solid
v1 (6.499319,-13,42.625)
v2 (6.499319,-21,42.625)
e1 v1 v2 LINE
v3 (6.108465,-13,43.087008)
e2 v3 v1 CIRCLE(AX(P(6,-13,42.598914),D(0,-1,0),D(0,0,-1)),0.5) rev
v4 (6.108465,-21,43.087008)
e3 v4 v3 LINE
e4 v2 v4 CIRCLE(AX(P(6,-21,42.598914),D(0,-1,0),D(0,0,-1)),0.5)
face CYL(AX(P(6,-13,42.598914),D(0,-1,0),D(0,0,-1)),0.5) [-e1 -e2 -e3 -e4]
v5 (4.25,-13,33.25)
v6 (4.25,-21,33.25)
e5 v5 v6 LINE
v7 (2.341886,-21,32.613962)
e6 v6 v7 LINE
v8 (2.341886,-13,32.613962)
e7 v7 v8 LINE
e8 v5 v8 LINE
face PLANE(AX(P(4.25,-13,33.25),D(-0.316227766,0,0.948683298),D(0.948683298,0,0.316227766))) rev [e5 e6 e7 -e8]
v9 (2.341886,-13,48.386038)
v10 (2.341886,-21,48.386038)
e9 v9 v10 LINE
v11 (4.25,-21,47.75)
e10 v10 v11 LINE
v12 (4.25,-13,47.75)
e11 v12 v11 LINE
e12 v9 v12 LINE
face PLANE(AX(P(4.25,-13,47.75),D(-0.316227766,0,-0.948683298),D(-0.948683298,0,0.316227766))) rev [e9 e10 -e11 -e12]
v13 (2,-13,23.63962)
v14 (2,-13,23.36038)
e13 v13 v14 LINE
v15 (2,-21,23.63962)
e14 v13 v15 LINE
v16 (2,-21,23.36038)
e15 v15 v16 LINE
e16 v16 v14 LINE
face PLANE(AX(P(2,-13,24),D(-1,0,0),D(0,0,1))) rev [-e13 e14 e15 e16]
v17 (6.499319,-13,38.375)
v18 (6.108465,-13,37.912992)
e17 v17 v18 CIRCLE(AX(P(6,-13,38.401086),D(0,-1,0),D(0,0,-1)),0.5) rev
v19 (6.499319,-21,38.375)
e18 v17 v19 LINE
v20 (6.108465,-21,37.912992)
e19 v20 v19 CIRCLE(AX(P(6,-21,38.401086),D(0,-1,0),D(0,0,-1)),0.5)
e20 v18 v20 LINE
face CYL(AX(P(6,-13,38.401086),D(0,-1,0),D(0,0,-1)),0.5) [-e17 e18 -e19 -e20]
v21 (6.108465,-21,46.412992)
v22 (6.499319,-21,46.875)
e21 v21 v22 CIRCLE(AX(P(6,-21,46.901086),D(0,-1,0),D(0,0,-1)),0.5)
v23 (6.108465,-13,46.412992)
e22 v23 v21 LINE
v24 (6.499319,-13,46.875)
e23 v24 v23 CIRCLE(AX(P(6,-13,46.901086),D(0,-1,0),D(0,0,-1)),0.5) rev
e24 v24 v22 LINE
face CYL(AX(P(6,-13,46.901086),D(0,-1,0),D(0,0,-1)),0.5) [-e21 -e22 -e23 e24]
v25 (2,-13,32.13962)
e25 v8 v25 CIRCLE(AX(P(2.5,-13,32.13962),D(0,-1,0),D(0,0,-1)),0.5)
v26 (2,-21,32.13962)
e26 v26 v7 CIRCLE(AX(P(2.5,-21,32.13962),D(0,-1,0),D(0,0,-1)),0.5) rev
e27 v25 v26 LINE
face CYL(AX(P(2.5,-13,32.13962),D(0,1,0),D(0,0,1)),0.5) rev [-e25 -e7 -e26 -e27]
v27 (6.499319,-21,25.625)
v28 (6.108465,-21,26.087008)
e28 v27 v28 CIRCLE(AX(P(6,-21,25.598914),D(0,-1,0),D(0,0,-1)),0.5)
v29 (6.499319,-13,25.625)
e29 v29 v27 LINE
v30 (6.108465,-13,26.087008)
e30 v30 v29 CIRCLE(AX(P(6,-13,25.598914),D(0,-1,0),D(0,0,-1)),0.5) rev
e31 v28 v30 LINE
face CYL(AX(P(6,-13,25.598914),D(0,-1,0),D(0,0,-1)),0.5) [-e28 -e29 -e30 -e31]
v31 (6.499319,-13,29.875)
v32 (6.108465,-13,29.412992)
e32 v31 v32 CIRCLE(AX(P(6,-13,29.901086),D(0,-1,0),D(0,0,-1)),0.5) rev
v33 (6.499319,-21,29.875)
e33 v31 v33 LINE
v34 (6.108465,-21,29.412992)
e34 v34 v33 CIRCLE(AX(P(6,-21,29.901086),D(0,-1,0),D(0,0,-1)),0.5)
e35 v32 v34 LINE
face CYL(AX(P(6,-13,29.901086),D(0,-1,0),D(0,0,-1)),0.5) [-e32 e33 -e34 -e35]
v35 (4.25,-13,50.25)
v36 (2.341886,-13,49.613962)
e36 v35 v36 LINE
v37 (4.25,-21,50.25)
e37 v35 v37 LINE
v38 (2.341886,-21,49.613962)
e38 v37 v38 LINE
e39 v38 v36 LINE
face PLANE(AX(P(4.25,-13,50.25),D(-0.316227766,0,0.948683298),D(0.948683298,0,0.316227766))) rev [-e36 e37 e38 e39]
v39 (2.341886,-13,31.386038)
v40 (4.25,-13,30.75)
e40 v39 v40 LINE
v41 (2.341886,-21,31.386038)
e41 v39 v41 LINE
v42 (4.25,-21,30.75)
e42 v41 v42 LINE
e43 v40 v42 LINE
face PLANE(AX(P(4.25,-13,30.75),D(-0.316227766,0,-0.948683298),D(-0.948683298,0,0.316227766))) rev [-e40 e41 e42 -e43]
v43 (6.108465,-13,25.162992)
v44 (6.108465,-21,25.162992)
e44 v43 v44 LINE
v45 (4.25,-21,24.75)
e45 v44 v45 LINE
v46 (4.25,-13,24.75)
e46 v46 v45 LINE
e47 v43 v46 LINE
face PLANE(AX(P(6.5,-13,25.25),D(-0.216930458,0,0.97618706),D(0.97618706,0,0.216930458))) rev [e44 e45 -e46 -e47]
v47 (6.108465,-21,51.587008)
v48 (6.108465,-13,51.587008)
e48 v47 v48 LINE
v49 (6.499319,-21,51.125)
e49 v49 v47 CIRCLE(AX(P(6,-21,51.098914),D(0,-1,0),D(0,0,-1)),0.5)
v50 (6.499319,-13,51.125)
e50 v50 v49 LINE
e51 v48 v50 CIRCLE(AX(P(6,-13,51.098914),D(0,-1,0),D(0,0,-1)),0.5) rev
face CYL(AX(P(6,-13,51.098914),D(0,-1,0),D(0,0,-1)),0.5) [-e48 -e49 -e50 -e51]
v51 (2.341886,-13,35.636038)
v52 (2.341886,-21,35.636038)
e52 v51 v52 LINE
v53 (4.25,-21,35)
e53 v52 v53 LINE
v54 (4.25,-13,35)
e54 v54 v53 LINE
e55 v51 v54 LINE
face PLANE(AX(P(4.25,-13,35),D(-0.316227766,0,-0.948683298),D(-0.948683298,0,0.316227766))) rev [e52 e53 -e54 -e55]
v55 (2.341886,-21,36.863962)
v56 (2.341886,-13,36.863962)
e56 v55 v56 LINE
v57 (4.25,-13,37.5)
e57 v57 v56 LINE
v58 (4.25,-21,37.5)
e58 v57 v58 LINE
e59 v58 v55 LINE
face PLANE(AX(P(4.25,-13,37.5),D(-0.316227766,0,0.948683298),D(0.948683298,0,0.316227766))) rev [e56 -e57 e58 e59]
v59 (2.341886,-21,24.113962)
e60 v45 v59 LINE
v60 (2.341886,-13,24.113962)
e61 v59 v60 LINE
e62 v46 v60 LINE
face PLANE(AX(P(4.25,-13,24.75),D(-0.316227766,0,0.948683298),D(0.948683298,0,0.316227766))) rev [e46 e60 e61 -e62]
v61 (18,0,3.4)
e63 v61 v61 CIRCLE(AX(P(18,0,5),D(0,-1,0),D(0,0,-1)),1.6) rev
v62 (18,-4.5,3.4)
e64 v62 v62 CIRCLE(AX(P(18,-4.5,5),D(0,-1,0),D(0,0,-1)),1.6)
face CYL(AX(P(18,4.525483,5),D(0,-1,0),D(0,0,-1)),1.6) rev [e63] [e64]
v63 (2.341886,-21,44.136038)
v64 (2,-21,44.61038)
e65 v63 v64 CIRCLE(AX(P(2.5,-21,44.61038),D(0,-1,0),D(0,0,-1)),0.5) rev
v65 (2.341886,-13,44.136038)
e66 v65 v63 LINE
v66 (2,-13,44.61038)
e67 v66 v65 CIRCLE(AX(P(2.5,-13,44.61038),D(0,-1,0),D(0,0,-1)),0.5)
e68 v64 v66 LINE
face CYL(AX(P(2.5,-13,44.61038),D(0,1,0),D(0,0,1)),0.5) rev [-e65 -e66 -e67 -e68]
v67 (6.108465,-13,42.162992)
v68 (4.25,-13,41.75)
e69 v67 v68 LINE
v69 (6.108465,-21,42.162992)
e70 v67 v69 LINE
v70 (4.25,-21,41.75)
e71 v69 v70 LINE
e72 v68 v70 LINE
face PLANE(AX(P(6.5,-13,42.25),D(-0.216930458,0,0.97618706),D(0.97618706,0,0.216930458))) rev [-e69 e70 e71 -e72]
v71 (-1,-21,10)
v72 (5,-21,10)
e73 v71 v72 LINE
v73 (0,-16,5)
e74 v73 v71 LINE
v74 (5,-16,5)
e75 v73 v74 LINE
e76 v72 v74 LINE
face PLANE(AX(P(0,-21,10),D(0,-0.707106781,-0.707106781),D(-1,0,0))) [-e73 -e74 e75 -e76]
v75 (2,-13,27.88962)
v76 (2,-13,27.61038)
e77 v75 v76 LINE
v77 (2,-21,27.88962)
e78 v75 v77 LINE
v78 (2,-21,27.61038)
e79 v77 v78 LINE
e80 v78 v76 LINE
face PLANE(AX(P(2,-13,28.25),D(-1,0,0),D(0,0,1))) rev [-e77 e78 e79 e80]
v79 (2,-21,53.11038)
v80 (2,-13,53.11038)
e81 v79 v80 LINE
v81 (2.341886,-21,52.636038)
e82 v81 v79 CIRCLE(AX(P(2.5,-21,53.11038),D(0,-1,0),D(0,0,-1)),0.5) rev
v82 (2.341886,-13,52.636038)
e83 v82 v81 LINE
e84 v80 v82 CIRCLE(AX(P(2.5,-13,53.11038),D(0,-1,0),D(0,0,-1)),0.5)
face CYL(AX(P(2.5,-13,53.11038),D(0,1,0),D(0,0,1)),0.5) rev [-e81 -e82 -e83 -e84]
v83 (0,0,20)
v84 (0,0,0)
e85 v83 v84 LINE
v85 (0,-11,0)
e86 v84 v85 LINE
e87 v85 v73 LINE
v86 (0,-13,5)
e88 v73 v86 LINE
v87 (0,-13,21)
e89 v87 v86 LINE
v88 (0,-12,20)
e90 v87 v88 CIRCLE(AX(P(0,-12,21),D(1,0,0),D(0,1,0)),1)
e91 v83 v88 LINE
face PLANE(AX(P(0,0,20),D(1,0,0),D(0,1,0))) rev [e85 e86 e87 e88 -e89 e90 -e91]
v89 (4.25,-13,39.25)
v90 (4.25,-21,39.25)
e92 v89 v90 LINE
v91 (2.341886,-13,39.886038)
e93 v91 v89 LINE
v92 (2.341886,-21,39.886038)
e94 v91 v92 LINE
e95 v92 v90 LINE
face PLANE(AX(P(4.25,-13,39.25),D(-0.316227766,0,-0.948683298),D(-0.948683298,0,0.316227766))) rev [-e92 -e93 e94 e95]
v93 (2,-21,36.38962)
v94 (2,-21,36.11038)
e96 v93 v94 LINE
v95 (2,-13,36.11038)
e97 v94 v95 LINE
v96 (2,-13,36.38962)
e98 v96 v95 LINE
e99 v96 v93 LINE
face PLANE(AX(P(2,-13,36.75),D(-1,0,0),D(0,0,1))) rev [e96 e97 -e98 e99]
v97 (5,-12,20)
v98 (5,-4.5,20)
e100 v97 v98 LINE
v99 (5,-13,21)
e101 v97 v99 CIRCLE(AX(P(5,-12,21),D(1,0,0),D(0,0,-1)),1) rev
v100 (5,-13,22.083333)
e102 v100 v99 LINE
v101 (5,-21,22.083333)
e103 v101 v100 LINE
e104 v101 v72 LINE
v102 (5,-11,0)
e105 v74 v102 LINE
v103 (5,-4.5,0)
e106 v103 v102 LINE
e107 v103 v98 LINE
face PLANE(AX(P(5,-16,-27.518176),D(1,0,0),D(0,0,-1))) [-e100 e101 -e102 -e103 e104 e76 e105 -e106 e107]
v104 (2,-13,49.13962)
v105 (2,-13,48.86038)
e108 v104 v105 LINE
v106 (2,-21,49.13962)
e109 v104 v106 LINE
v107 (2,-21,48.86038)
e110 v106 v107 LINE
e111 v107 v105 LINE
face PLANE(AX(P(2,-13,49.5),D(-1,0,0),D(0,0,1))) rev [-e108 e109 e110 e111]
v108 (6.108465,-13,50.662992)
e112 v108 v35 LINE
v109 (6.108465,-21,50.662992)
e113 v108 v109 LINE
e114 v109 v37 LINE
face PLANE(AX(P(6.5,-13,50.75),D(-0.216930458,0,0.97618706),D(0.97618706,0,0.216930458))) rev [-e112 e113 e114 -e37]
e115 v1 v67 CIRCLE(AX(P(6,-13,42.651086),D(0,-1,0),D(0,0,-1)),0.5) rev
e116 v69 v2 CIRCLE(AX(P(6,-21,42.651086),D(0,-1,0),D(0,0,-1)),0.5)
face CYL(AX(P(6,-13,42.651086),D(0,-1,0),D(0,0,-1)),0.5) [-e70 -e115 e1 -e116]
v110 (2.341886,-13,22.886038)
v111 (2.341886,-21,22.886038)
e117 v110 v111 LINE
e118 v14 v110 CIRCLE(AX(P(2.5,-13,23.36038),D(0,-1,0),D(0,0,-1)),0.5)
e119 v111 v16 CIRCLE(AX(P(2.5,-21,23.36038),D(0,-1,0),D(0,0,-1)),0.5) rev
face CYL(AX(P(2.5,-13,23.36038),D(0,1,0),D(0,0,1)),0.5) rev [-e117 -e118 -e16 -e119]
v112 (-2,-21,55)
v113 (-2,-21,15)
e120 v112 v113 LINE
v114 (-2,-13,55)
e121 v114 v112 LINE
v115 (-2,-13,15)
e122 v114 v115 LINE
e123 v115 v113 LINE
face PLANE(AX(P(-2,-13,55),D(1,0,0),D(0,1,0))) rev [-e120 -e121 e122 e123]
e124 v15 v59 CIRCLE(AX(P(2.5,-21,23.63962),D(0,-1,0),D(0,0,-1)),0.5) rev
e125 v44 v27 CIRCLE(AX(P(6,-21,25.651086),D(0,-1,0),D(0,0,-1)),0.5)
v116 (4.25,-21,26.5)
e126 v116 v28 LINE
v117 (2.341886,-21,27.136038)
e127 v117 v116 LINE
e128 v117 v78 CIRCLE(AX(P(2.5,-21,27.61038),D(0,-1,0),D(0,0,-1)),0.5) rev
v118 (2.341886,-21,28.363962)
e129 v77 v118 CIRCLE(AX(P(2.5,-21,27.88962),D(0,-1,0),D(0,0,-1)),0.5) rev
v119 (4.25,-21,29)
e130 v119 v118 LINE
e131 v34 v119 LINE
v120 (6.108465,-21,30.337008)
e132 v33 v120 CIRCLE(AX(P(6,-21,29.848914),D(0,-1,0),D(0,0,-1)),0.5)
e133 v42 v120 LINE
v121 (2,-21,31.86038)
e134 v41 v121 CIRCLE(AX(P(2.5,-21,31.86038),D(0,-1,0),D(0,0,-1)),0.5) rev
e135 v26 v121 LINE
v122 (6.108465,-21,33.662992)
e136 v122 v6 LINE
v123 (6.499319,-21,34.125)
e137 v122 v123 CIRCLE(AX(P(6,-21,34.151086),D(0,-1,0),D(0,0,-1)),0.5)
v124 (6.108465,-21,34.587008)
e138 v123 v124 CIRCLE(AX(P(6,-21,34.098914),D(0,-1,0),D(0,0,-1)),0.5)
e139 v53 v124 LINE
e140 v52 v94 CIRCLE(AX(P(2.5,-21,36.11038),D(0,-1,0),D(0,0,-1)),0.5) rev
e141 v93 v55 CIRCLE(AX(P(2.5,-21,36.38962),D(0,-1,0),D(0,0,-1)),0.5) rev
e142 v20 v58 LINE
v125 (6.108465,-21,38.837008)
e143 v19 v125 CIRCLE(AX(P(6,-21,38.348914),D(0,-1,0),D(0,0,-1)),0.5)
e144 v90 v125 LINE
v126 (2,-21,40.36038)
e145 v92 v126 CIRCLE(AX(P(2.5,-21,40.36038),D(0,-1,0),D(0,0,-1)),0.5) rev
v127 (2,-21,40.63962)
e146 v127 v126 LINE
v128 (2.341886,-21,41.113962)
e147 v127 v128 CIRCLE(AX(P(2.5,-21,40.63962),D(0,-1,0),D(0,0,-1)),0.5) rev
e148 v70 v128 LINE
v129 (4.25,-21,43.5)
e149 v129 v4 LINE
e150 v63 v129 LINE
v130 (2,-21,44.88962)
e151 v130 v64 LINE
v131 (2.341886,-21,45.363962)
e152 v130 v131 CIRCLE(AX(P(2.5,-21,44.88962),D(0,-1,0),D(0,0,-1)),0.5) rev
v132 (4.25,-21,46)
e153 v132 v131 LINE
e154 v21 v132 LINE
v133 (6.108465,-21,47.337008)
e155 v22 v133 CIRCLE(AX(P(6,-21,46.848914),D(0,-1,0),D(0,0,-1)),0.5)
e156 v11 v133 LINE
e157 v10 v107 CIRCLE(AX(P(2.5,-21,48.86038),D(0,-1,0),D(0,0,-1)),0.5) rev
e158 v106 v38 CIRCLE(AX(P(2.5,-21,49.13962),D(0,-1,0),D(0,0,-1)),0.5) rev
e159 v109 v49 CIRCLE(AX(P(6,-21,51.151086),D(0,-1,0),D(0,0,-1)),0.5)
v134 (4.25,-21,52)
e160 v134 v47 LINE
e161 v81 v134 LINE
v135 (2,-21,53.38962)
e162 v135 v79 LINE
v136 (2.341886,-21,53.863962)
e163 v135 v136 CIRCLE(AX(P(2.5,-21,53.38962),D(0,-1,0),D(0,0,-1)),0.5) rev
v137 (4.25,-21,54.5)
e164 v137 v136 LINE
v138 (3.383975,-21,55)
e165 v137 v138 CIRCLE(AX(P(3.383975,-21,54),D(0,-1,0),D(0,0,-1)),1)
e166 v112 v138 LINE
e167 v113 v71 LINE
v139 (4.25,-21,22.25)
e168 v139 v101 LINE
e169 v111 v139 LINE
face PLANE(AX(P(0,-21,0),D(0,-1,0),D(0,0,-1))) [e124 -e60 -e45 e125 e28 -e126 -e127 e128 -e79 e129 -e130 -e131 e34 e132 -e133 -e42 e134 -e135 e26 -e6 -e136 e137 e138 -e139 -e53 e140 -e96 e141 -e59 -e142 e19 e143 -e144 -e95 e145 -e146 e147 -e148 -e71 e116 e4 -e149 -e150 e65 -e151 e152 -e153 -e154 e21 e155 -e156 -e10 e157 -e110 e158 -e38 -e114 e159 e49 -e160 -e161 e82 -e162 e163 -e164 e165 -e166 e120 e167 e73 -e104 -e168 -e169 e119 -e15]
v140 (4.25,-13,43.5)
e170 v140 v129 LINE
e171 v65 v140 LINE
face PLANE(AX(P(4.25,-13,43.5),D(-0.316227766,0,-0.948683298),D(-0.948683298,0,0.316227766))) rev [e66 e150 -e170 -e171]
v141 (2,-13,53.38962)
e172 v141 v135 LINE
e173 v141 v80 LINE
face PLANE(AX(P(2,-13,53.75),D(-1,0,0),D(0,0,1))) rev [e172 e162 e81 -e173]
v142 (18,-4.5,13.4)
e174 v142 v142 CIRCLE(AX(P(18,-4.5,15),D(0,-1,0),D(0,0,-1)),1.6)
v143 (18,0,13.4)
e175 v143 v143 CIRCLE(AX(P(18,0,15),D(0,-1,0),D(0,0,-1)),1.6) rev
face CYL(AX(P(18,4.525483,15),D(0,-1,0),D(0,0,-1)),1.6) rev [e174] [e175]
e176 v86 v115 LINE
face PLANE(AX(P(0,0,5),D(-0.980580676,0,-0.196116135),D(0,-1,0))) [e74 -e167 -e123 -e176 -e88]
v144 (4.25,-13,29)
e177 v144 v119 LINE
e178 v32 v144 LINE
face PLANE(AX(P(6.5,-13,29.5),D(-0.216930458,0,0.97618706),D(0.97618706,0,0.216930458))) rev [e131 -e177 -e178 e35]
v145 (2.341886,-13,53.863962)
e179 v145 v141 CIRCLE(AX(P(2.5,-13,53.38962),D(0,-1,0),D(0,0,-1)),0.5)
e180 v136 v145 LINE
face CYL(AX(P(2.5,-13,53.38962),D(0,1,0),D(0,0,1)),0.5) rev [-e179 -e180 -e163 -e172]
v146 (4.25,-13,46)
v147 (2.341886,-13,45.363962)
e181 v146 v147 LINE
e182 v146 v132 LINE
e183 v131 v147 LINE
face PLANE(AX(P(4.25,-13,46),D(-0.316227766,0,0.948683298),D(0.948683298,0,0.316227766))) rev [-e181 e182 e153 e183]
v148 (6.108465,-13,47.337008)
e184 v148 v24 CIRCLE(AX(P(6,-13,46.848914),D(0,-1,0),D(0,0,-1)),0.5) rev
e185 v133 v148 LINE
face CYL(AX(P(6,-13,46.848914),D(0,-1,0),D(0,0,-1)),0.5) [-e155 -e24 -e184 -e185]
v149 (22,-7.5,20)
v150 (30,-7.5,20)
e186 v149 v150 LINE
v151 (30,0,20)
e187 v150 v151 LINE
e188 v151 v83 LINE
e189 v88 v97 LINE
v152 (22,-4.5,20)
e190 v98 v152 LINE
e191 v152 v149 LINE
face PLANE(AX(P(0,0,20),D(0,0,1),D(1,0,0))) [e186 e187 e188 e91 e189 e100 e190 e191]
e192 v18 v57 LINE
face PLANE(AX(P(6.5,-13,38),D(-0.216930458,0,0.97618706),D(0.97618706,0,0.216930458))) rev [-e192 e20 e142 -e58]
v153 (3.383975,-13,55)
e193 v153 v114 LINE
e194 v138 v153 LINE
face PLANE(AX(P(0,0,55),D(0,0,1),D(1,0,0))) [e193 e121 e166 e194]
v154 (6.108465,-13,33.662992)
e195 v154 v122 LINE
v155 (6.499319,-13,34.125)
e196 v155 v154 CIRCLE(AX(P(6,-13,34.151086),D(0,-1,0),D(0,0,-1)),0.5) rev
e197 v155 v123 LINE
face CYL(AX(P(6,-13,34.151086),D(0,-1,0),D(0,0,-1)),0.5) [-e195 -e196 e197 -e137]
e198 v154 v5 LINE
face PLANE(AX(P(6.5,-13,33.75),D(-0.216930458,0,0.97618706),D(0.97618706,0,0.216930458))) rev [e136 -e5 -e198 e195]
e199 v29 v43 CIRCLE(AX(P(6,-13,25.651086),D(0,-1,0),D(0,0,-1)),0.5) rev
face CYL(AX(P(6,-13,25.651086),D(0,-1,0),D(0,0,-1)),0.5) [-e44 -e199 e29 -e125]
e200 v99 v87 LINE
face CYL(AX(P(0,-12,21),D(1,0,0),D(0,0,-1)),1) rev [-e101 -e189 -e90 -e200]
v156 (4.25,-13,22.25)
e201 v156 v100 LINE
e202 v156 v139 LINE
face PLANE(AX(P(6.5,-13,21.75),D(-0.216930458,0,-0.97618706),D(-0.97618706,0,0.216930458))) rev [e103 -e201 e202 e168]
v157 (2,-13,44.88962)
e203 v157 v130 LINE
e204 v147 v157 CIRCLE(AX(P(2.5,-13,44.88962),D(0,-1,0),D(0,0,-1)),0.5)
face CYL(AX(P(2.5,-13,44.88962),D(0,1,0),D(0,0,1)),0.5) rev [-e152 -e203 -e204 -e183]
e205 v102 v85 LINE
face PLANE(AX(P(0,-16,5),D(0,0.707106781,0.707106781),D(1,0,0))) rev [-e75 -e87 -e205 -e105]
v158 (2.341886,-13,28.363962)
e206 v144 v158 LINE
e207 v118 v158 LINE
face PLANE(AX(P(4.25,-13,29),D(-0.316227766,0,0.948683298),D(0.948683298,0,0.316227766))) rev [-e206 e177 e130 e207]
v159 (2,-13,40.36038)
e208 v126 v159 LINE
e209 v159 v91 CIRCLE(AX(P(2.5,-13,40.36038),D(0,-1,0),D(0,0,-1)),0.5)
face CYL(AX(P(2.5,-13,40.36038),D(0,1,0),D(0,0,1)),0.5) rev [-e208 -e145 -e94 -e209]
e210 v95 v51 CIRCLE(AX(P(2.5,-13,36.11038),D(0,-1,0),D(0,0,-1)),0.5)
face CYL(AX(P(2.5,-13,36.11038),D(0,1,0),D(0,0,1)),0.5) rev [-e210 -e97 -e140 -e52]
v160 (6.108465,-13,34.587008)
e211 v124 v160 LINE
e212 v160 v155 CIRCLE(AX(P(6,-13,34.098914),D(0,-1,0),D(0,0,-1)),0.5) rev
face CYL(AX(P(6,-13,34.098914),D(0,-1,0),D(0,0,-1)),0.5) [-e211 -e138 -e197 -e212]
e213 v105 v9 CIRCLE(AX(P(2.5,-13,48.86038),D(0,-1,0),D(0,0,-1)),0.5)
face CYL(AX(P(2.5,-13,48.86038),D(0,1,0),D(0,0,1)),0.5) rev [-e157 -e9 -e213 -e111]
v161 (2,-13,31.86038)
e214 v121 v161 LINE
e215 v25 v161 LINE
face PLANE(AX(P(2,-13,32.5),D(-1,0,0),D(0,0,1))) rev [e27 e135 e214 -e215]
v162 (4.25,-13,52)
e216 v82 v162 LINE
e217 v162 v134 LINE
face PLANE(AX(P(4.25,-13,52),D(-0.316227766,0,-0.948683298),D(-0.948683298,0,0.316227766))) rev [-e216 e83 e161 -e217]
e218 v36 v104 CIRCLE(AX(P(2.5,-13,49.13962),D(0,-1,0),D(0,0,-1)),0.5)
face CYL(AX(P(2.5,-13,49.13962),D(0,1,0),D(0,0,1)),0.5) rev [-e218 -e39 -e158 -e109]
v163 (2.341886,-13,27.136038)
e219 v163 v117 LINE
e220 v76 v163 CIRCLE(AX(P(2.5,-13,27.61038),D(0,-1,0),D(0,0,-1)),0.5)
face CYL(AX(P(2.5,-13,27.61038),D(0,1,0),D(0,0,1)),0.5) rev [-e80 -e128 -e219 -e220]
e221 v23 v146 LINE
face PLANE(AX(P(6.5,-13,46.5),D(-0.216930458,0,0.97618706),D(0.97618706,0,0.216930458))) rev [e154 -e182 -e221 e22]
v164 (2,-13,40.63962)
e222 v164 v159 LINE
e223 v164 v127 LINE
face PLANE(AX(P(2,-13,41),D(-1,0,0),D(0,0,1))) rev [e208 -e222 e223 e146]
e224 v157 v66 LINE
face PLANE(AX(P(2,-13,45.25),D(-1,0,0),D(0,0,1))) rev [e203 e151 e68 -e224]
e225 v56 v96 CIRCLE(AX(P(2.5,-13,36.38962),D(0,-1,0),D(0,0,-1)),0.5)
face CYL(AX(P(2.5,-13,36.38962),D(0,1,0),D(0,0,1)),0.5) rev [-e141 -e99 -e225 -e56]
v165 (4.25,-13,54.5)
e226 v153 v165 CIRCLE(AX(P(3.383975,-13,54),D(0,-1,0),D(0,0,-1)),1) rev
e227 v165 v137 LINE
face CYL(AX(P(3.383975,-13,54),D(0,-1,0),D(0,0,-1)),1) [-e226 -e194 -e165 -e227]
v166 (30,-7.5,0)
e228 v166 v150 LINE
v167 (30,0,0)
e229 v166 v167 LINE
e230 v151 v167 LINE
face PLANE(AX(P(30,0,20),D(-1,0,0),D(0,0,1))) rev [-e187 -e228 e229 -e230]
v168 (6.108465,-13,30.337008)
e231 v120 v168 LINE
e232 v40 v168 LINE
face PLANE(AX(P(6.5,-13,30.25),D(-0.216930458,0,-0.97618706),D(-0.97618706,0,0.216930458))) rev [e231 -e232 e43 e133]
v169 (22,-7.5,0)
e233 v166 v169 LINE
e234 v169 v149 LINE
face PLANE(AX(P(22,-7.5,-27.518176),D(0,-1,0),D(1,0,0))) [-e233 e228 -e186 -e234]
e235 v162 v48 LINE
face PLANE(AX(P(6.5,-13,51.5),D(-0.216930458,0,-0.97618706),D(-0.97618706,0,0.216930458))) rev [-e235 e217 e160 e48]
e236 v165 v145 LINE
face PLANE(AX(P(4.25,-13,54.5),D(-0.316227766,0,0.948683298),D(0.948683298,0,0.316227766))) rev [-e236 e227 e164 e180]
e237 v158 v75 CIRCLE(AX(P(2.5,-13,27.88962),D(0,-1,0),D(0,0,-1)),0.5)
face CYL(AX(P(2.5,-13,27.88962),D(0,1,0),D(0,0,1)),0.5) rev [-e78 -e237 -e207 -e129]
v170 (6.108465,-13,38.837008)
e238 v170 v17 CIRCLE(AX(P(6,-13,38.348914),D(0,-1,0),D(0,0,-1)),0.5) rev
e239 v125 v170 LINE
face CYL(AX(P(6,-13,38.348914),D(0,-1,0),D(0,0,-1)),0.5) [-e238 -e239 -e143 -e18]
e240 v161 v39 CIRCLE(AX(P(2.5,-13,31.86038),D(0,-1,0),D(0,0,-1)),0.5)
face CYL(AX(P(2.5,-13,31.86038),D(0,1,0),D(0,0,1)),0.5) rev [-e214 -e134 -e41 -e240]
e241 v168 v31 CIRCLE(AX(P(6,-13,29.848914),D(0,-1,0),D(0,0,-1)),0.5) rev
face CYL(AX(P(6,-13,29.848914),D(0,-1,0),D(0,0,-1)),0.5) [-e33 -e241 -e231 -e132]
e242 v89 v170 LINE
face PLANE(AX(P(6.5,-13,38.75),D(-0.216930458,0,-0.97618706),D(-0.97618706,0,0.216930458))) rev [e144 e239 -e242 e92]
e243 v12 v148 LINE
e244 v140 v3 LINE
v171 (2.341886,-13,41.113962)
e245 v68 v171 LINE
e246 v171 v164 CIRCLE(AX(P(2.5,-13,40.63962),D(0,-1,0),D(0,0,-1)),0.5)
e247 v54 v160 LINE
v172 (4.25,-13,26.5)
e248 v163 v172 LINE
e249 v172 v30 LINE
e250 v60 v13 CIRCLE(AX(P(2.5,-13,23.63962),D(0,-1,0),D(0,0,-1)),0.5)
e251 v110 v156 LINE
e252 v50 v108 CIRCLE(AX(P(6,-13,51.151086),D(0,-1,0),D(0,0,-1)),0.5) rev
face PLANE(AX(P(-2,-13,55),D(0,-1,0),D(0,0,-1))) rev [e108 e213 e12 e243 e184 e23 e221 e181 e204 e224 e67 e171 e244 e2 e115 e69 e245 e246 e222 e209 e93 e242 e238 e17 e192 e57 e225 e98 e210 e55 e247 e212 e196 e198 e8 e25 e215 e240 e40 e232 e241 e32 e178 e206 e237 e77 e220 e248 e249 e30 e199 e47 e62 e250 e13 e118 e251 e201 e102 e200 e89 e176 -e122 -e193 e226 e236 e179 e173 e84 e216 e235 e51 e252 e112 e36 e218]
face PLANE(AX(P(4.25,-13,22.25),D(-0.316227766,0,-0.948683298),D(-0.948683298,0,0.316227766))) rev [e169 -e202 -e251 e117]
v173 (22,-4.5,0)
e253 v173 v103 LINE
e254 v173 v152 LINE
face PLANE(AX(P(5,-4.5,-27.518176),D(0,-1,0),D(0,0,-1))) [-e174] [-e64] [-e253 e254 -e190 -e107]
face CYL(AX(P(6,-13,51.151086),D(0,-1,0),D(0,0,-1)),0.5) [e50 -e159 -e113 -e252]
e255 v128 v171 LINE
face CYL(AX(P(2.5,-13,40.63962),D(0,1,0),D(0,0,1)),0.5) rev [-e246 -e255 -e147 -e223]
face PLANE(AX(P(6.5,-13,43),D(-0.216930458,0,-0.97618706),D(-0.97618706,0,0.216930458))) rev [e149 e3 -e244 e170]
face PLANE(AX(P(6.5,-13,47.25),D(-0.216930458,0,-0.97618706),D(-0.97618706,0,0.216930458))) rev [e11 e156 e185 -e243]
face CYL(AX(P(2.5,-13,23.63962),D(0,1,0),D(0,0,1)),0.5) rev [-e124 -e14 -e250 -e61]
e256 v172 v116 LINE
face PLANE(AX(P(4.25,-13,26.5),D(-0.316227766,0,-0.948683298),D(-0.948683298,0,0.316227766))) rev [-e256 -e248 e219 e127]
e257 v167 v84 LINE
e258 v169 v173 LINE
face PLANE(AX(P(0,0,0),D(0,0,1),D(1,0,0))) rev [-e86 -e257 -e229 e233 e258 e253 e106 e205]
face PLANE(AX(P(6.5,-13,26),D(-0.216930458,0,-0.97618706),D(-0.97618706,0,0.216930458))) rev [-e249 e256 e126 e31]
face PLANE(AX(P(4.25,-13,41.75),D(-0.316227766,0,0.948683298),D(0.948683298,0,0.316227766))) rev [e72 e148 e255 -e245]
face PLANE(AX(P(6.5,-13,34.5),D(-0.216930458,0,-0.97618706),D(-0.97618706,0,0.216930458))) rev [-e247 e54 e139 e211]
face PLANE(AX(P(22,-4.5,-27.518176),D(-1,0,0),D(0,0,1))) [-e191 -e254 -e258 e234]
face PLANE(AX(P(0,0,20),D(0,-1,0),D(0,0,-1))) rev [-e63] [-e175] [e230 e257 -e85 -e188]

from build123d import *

# Parameters (mm, degrees)
SKETCH1_W           = 30
SKETCH1_H           = 16
BOSS_EXTRUDE1_DEPTH = 20
CUT_EXTRUDE1_DEPTH  = 20
SKETCH3_W           = 6
SKETCH3_H           = 10
BOSS_EXTRUDE2_DEPTH = 5
SKETCH9_R           = 1.6
CUT_EXTRUDE3_DEPTH  = 4.5
SKETCH11_W          = 10
SKETCH11_H          = 8
BOSS_EXTRUDE4_DEPTH = 40
CHAMFER2_SIZE2      = 10
CHAMFER2_SIZE       = 2
FILLET1_R           = 1
CUT_EXTRUDE4_DEPTH  = 8
SKETCH13_W          = 2
SKETCH13_H          = 8
BOSS_EXTRUDE5_DEPTH = 10
LPATTERN1_COUNT     = 8
LPATTERN1_PITCH     = 4.25
FILLET2_R           = 0.5
FILLET3_R           = 1
SKETCH14_W          = 2
SKETCH14_H          = 8
CUT_EXTRUDE5_DEPTH  = 17
CHAMFER9_SIZE       = 5
SKETCH15_W          = 19.120114905
SKETCH15_H          = 8.62957368
CUT_EXTRUDE6_DEPTH  = 1


# Some blends are built 0.0001 mm under size
with BuildPart() as part:
    # Sketch1 → Boss-Extrude1 (new body)
    with BuildSketch(Plane.XY):
        with Locations((15, -8)):
            Rectangle(SKETCH1_W, SKETCH1_H)
    extrude(amount=BOSS_EXTRUDE1_DEPTH)

    # Sketch2 → Cut-Extrude1 (cut)
    with BuildSketch(Plane.XY.offset(20)):
        Polygon((22, -4.5), (22, -7.5), (30, -7.5), (30, -16), (5, -16), (5, -4.5), align=None)
    extrude(amount=-CUT_EXTRUDE1_DEPTH, mode=Mode.SUBTRACT)

    # Sketch3 → Boss-Extrude2 (add)
    with BuildSketch(Plane.XZ.offset(16)):
        with Locations((3, 10)):
            Rectangle(SKETCH3_W, SKETCH3_H)
    extrude(amount=BOSS_EXTRUDE2_DEPTH)

    # Sketch9 → Cut-Extrude3 (cut)
    with BuildSketch(Plane.XZ.offset(4.5)):
        with Locations(Location((18, 15, 0), (0, 0, 270))):
            Circle(SKETCH9_R)
        with Locations(Location((18, 5, 0), (0, 0, 270))):
            Circle(SKETCH9_R)
    extrude(amount=-CUT_EXTRUDE3_DEPTH, mode=Mode.SUBTRACT)

    # Sketch11 → Boss-Extrude4 (add)
    with BuildSketch(Plane.XY.offset(15)):
        with Locations((3, -17)):
            Rectangle(SKETCH11_W, SKETCH11_H)
    extrude(amount=BOSS_EXTRUDE4_DEPTH)

    # Chamfer2
    chamfer2_edges = [part.edges().sort_by_distance(p)[0] for p in [
        (0, -17, 15),
    ]]
    chamfer2_side = [part.faces().sort_by_distance(p)[0] for p in [
        (-0.04, -17, 15),
    ]]
    chamfer(chamfer2_edges, length=CHAMFER2_SIZE - 0.0001, length2=CHAMFER2_SIZE2 - 0.0001, reference=chamfer2_side[0])  # a hair under: the kernel refuses the full size

    # Fillet1
    fillet1_edges = [part.edges().sort_by_distance(p)[0] for p in [
        (2.5, -13, 20),
    ]]
    fillet(fillet1_edges, radius=FILLET1_R)

    # Sketch12 → Cut-Extrude4 (cut)
    with BuildSketch(Plane.XZ.offset(21)):
        Polygon((6.5, 55), (4.25, 54.5), (2, 53.75), (2, 52.75), (4.25, 52), (6.5, 51.5), (6.5, 50.75), (8, 50.75), (8, 55), align=None)
    cut_extrude4 = extrude(amount=-CUT_EXTRUDE4_DEPTH, mode=Mode.SUBTRACT)

    # Sketch13 → Boss-Extrude5 (add)
    with BuildSketch(Plane(origin=(0, 0, 15), x_dir=(-1, 0, 0), z_dir=(0, 0, -1))):
        with Locations((-7, -17)):
            Rectangle(SKETCH13_W, SKETCH13_H)
    extrude(amount=BOSS_EXTRUDE5_DEPTH)

    # LPattern1: Cut-Extrude4 ×8
    with Locations(*[(0, 0, -i * LPATTERN1_PITCH) for i in range(1, LPATTERN1_COUNT)]):
        add(cut_extrude4, mode=Mode.SUBTRACT)

    # Fillet2
    # the kernel refuses this fillet: 0.5 mm, written as the material it adds along each edge
    with BuildSketch(Plane(origin=(2, -21, 52.75), x_dir=(0.9486832980505142, 0, -0.31622776601683683), z_dir=(0, 1, 0)), Plane(origin=(2, -21, 53.75), x_dir=(0, 0, -1), z_dir=(0, 1, 0)), Plane(origin=(2, -21, 48.5), x_dir=(0.9486832980505137, 0, -0.31622776601683833), z_dir=(0, 1, 0)), Plane(origin=(2, -21, 49.5), x_dir=(0, 0, -1), z_dir=(0, 1, 0)), Plane(origin=(2, -21, 44.25), x_dir=(0.9486832980505137, 0, -0.31622776601683833), z_dir=(0, 1, 0)), Plane(origin=(2, -21, 45.25), x_dir=(0, 0, -1), z_dir=(0, 1, 0)), Plane(origin=(2, -21, 35.75), x_dir=(0.9486832980505137, 0, -0.31622776601683833), z_dir=(0, 1, 0)), Plane(origin=(2, -21, 36.75), x_dir=(0, 0, -1), z_dir=(0, 1, 0)), Plane(origin=(2, -21, 40), x_dir=(0.9486832980505137, 0, -0.31622776601683833), z_dir=(0, 1, 0)), Plane(origin=(2, -21, 41), x_dir=(0, 0, -1), z_dir=(0, 1, 0)), Plane(origin=(2, -21, 23), x_dir=(0.9486832980505137, 0, -0.31622776601683833), z_dir=(0, 1, 0)), Plane(origin=(2, -21, 24), x_dir=(0, 0, -1), z_dir=(0, 1, 0)), Plane(origin=(2, -21, 27.25), x_dir=(0.9486832980505137, 0, -0.31622776601683833), z_dir=(0, 1, 0)), Plane(origin=(2, -21, 28.25), x_dir=(0, 0, -1), z_dir=(0, 1, 0)), Plane(origin=(2, -21, 32.5), x_dir=(0, 0, -1), z_dir=(0, 1, 0)), Plane(origin=(2, -21, 31.5), x_dir=(0.9486832980505137, 0, -0.31622776601683833), z_dir=(0, 1, 0))) as fillet2_piece_1:
        with BuildLine():
            CenterArc((FILLET2_R * 0.720759220056, -FILLET2_R), FILLET2_R, 90, 71.565051177)
            Line((-FILLET2_R * 0.227924077994, -FILLET2_R * 0.683772233983), (0, 0))
            Line((0, 0), (FILLET2_R * 0.720759220056, 0))
        make_face()
    extrude(amount=8)
    # the kernel refuses this fillet: 0.5 mm, written as the material it takes off along each edge
    with BuildSketch(Plane(origin=(6.5, -22.002714508, 33.75), x_dir=(-0.9761870601839537, 0, -0.21693045781865147), z_dir=(0, 1, 0)), Plane(origin=(6.5, -22.002714508, 34.5), x_dir=(0, 0, -1), z_dir=(0, 1, 0)), Plane(origin=(6.5, -22.002714508, 38), x_dir=(-0.9761870601839536, 0, -0.21693045781865192), z_dir=(0, 1, 0)), Plane(origin=(6.5, -22.002714508, 38.75), x_dir=(0, 0, -1), z_dir=(0, 1, 0)), Plane(origin=(6.5, -22.002714508, 42.25), x_dir=(-0.9761870601839541, 0, -0.21693045781865056), z_dir=(0, 1, 0)), Plane(origin=(6.5, -22.002714508, 43), x_dir=(0, 0, -1), z_dir=(0, 1, 0)), Plane(origin=(6.5, -22.002714508, 46.5), x_dir=(-0.9761870601839537, 0, -0.21693045781865147), z_dir=(0, 1, 0)), Plane(origin=(6.5, -22.002714508, 47.25), x_dir=(0, 0, -1), z_dir=(0, 1, 0)), Plane(origin=(6.5, -22.002714508, 50.75), x_dir=(-0.9761870601839541, 0, -0.21693045781865006), z_dir=(0, 1, 0)), Plane(origin=(6.5, -22.002714508, 51.5), x_dir=(0, 0, -1), z_dir=(0, 1, 0)), Plane(origin=(6.5, -22.002714508, 25.25), x_dir=(-0.9761870601839524, 0, -0.21693045781865805), z_dir=(0, 1, 0)), Plane(origin=(6.5, -22.002714508, 26), x_dir=(0, 0, -1), z_dir=(0, 1, 0)), Plane(origin=(6.5, -22.002714508, 29.5), x_dir=(-0.9761870601839522, 0, -0.216930457818659), z_dir=(0, 1, 0)), Plane(origin=(6.5, -22.002714508, 30.25), x_dir=(0, 0, -1), z_dir=(0, 1, 0))) as fillet2_2_piece_1:
        with BuildLine():
            CenterArc((FILLET2_R * 0.802171606366, FILLET2_R), FILLET2_R, 192.528807709, 77.471192291)
            Line((-FILLET2_R * 0.174015453818, FILLET2_R * 0.783069542181), (0, 0))
            Line((0, 0), (FILLET2_R * 0.802171606366, 0))
        make_face()
    extrude(amount=10.005429016, mode=Mode.SUBTRACT)

    # Fillet3
    # the kernel refuses this fillet: 1 mm, written as the material it takes off along each edge
    with BuildSketch(Plane(origin=(6.5, -28.790063509, 55), x_dir=(-1, 0, 0), z_dir=(0, 1, 0))) as fillet3_piece_1:
        with BuildLine():
            CenterArc((3.116025404, -1), FILLET3_R, 90, 60)
            Line((2.25, -0.5), (0, 0))
            Line((0, 0), (3.116025404, 0))
        make_face()
    extrude(amount=23.580127019, mode=Mode.SUBTRACT)

    # Sketch14 → Cut-Extrude5 (cut)
    with BuildSketch(Plane(origin=(0, 0, 5), x_dir=(-1, 0, 0), z_dir=(0, 0, -1))):
        with Locations((-7, -17)):
            Rectangle(SKETCH14_W, SKETCH14_H)
    extrude(amount=-CUT_EXTRUDE5_DEPTH, mode=Mode.SUBTRACT)

    # Chamfer9
    # the kernel refuses this chamfer: 5 mm, written as the material it takes off along each edge
    with BuildSketch(Plane(origin=(5, -16, 17.85841494), x_dir=(0, 1, 0), z_dir=(0, 0, -1))) as chamfer9_piece_1_section:
        Polygon((CHAMFER9_SIZE, 0), (0, -CHAMFER9_SIZE), (0, 0), align=None)
    chamfer9_piece_1 = extrude(amount=30.71682988, mode=Mode.PRIVATE)
    chamfer9_piece_1 = split(chamfer9_piece_1, bisect_by=Plane(origin=(5, -22.42920747, 11.42920747), z_dir=(0, -0.7071067811865476, -0.7071067811865476)), keep=Keep.TOP, mode=Mode.PRIVATE)
    add(chamfer9_piece_1, mode=Mode.SUBTRACT)
    with BuildSketch(Plane(origin=(0, -16, -12.85841494), x_dir=(0, 1, 0), z_dir=(0, 0, 1))) as chamfer9_piece_2_section:
        Polygon((CHAMFER9_SIZE, 0), (0, -CHAMFER9_SIZE), (0, 0), align=None)
    chamfer9_piece_2 = extrude(amount=30.71682988, mode=Mode.PRIVATE)
    chamfer9_piece_2 = split(chamfer9_piece_2, bisect_by=Plane(origin=(0, -7.07079253, -3.92920747), z_dir=(0, -0.7071067811865476, -0.7071067811865476)), keep=Keep.TOP, mode=Mode.PRIVATE)
    add(chamfer9_piece_2, mode=Mode.SUBTRACT)
    with BuildSketch(Plane(origin=(0, -3.14158506, 5), x_dir=(1, 0, 0), z_dir=(0, -1, 0))) as chamfer9_piece_3_section:
        Polygon((CHAMFER9_SIZE, 0), (0, CHAMFER9_SIZE), (0, 0), align=None)
    chamfer9_piece_3 = extrude(amount=30.71682988, mode=Mode.PRIVATE)
    chamfer9_piece_3 = split(chamfer9_piece_3, bisect_by=Plane(origin=(0, -9.57079253, -1.42920747), z_dir=(0, -0.707106781186547, -0.7071067811865481)), keep=Keep.TOP, mode=Mode.PRIVATE)
    add(chamfer9_piece_3, mode=Mode.SUBTRACT)
    with BuildSketch(Plane(origin=(18.85841494, -21, 5), x_dir=(0, 0, 1), z_dir=(-1, 0, 0))) as chamfer9_piece_4:
        Polygon((CHAMFER9_SIZE, 0), (0, CHAMFER9_SIZE), (0, 0), align=None)
    extrude(amount=31.71682988, mode=Mode.SUBTRACT)
    with BuildSketch(Plane(origin=(6, -33.85841494, 5), x_dir=(0, 0, 1), z_dir=(0, 1, 0))) as chamfer9_piece_5_section:
        Polygon((CHAMFER9_SIZE, 0), (0, -CHAMFER9_SIZE), (0, 0), align=None)
    chamfer9_piece_5 = extrude(amount=30.71682988, mode=Mode.PRIVATE)
    chamfer9_piece_5 = split(chamfer9_piece_5, bisect_by=Plane(origin=(6, -24.92920747, 13.92920747), z_dir=(0, -0.707106781186547, -0.7071067811865481)), keep=Keep.TOP, mode=Mode.PRIVATE)
    add(chamfer9_piece_5, mode=Mode.SUBTRACT)
    with BuildSketch(Plane(origin=(17.85841494, -16, 0), x_dir=(0, 0, 1), z_dir=(-1, 0, 0))) as chamfer9_piece_6:
        Polygon((CHAMFER9_SIZE, 0), (0, CHAMFER9_SIZE), (0, 0), align=None)
    extrude(amount=30.71682988, mode=Mode.SUBTRACT)

    # Sketch15 → Cut-Extrude6 (cut)
    with BuildSketch(Plane(origin=(6, 0, 0), x_dir=(0, 0, -1), z_dir=(1, 0, 0))):
        with Locations((-12.83373262, -16.68521316)):
            Rectangle(SKETCH15_W, SKETCH15_H)
    extrude(amount=-CUT_EXTRUDE6_DEPTH, mode=Mode.SUBTRACT)


solid = part.part
